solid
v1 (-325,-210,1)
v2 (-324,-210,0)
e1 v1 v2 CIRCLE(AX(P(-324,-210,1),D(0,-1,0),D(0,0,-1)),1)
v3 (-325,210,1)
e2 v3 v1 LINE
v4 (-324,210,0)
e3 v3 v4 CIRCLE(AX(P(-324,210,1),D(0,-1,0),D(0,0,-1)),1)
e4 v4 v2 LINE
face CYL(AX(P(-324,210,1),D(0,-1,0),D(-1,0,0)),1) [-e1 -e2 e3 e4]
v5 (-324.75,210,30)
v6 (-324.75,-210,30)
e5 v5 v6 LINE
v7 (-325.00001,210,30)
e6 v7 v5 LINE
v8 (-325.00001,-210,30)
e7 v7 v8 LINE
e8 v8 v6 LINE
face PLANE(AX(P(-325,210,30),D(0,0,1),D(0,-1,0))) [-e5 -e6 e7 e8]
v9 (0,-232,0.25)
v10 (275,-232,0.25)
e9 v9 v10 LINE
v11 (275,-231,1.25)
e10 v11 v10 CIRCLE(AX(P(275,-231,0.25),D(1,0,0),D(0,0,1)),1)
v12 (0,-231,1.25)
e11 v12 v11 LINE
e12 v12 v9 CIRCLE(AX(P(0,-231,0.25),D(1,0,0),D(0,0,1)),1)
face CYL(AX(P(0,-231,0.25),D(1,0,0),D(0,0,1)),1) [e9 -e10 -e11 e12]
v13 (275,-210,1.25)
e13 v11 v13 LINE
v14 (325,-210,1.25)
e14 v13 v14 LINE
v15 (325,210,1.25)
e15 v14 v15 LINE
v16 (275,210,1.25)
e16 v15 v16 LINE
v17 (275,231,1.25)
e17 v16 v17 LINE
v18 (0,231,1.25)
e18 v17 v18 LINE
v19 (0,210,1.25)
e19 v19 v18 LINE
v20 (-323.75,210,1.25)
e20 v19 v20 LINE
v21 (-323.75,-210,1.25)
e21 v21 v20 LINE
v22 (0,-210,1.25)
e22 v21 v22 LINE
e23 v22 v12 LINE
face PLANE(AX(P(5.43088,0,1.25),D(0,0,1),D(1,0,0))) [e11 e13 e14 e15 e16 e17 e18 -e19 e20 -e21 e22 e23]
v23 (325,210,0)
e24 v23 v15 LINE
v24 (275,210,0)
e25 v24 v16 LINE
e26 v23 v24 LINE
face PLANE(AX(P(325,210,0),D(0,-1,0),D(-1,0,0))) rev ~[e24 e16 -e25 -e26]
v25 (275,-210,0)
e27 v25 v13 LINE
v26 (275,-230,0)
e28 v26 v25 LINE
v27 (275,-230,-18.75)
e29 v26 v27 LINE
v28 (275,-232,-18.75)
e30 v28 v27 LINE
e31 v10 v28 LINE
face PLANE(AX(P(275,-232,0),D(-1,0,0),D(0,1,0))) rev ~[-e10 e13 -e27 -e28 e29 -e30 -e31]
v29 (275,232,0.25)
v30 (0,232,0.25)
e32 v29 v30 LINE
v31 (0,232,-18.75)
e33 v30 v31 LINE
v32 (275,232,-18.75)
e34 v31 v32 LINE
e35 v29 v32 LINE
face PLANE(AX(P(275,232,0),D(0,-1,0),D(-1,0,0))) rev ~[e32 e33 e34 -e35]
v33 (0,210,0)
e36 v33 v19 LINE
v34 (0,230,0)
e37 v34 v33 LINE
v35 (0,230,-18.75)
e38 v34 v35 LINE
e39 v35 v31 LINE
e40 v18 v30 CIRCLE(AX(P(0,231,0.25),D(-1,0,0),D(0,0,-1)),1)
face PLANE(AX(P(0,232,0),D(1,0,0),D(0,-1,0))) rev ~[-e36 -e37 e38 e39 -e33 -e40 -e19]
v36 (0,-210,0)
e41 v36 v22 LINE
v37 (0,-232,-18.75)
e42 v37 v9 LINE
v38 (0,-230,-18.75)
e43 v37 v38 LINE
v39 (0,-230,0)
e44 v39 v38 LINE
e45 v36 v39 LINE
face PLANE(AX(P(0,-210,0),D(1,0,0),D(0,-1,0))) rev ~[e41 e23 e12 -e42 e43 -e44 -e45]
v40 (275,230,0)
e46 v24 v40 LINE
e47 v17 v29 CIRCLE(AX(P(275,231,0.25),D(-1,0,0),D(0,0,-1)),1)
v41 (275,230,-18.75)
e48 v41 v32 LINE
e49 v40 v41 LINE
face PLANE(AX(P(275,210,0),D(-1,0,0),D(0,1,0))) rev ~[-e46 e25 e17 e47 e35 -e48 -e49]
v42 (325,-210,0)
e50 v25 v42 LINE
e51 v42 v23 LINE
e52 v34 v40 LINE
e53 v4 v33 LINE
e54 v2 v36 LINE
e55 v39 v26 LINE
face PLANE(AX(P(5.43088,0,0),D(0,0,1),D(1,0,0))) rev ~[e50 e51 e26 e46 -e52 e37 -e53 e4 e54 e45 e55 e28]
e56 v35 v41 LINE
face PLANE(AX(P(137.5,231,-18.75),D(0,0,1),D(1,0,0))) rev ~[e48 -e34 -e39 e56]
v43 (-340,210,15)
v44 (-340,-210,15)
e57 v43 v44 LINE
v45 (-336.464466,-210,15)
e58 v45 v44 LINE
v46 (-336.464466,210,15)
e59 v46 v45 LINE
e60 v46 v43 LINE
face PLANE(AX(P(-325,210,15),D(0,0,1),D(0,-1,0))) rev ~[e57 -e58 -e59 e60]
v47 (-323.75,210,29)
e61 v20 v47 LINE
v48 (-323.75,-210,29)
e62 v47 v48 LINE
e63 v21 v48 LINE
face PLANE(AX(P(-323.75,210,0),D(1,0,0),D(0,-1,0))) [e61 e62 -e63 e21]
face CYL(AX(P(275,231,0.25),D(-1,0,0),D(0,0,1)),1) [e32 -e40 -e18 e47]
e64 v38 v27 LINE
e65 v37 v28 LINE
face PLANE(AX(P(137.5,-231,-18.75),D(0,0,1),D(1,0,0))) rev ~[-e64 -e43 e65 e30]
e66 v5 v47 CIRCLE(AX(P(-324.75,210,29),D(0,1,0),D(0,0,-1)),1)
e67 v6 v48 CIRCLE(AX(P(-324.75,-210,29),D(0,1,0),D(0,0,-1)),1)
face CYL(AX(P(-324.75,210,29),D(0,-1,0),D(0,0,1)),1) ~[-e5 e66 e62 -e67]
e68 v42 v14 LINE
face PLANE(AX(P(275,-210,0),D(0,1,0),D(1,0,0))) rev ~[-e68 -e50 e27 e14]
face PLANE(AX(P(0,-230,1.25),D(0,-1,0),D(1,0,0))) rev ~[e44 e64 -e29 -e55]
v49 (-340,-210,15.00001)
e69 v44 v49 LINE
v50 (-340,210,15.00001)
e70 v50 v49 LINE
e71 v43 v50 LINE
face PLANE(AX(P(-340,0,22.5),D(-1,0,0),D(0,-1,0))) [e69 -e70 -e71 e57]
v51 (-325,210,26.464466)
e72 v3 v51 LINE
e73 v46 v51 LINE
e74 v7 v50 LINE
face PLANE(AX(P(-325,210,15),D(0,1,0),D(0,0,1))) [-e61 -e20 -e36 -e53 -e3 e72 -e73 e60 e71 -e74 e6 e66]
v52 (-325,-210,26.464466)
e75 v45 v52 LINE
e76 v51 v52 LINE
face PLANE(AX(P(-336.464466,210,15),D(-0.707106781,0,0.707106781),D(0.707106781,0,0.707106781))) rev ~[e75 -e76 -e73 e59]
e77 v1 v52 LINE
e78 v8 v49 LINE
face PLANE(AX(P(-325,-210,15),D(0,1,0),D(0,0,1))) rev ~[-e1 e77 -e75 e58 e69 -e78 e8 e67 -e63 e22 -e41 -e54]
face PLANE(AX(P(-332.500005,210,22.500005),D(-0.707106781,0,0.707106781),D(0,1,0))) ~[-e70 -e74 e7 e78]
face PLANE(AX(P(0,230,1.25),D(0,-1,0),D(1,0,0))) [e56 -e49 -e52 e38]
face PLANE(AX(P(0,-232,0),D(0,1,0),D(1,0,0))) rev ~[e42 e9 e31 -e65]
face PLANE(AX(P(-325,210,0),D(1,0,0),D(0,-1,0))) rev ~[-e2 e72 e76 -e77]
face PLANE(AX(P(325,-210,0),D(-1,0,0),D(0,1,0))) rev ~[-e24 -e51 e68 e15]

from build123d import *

# Parameters (mm, degrees)
F1_DEPTH  = 1.25
F2_W      = 275
F2_H      = 2
F3_DEPTH  = 20
F4_W      = 1.25
F4_H      = 420
F5_DEPTH  = 30
F6_W      = 420
F6_H      = 15
F7_DEPTH  = 15
F8_SIZE   = 14.99999
F10_R     = 1
F11_R     = 1
F12_DEPTH = 442.001


# Not quite as in the source:
# - a fillet or chamfer is up to 0.001 mm smaller than in the source, because OpenCascade refuses the exact size


with BuildPart() as f1:
    # F0 (on Top) → F1 (new body)
    with BuildSketch(Plane.XY):
        Polygon((0, -232), (275, -232), (275, -210), (325, -210), (325, 210), (275, 210), (275, 232), (0, 232), (0, 210), (-325, 210), (-325, -210), (0, -210), align=None)
    extrude(amount=F1_DEPTH)

    # F2 (on face) → F3 (join)
    with BuildSketch(Plane.XY.offset(1.25)):
        with Locations((137.5, 231)):
            Rectangle(F2_W, F2_H)
        with Locations((137.5, -231)):
            Rectangle(F2_W, F2_H)
    extrude(amount=-F3_DEPTH)

    # F4 (on face) → F5 (join)
    with BuildSketch(Plane(origin=(0, 0, 0), x_dir=(1, 0, 0), z_dir=(0, 0, -1))):
        with Locations((-324.375, 0)):
            Rectangle(F4_W, F4_H)
    extrude(amount=-F5_DEPTH)

    # F6 (on face) → F7 (join)
    with BuildSketch(Plane(origin=(-325, 0, 0), x_dir=(0, -1, 0), z_dir=(-1, 0, 0))):
        with Locations((0, 22.5)):
            Rectangle(F6_W, F6_H)
    extrude(amount=F7_DEPTH)

    # F8 (size 15 in the source; OpenCascade refuses exactly that, so slightly less here)
    f8_edges = [f1.edges().sort_by_distance(p)[0] for p in [
        (-340, 0, 30),
    ]]
    chamfer(f8_edges, length=F8_SIZE)

    # F10
    f10_edges = [f1.edges().sort_by_distance(p)[0] for p in [
        (-323.75, 0, 30),
    ]]
    fillet(f10_edges, radius=F10_R)

    # F11
    f11_edges = [f1.edges().sort_by_distance(p)[0] for p in [
        (-325, 0, 0),
        (137.5, 232, 1.25),
        (137.5, -232, 1.25),
    ]]
    fillet(f11_edges, radius=F11_R)

    # F9 (on face) → F12 (cut, through all)
    with BuildSketch(Plane(origin=(0, 210, 0), x_dir=(-1, 0, 0), z_dir=(0, 1, 0))):
        Polygon((336.4644660941, 15), (325, 26.4644660941), (325, 15), align=None)
    extrude(amount=-F12_DEPTH, mode=Mode.SUBTRACT)


solid = f1.part
